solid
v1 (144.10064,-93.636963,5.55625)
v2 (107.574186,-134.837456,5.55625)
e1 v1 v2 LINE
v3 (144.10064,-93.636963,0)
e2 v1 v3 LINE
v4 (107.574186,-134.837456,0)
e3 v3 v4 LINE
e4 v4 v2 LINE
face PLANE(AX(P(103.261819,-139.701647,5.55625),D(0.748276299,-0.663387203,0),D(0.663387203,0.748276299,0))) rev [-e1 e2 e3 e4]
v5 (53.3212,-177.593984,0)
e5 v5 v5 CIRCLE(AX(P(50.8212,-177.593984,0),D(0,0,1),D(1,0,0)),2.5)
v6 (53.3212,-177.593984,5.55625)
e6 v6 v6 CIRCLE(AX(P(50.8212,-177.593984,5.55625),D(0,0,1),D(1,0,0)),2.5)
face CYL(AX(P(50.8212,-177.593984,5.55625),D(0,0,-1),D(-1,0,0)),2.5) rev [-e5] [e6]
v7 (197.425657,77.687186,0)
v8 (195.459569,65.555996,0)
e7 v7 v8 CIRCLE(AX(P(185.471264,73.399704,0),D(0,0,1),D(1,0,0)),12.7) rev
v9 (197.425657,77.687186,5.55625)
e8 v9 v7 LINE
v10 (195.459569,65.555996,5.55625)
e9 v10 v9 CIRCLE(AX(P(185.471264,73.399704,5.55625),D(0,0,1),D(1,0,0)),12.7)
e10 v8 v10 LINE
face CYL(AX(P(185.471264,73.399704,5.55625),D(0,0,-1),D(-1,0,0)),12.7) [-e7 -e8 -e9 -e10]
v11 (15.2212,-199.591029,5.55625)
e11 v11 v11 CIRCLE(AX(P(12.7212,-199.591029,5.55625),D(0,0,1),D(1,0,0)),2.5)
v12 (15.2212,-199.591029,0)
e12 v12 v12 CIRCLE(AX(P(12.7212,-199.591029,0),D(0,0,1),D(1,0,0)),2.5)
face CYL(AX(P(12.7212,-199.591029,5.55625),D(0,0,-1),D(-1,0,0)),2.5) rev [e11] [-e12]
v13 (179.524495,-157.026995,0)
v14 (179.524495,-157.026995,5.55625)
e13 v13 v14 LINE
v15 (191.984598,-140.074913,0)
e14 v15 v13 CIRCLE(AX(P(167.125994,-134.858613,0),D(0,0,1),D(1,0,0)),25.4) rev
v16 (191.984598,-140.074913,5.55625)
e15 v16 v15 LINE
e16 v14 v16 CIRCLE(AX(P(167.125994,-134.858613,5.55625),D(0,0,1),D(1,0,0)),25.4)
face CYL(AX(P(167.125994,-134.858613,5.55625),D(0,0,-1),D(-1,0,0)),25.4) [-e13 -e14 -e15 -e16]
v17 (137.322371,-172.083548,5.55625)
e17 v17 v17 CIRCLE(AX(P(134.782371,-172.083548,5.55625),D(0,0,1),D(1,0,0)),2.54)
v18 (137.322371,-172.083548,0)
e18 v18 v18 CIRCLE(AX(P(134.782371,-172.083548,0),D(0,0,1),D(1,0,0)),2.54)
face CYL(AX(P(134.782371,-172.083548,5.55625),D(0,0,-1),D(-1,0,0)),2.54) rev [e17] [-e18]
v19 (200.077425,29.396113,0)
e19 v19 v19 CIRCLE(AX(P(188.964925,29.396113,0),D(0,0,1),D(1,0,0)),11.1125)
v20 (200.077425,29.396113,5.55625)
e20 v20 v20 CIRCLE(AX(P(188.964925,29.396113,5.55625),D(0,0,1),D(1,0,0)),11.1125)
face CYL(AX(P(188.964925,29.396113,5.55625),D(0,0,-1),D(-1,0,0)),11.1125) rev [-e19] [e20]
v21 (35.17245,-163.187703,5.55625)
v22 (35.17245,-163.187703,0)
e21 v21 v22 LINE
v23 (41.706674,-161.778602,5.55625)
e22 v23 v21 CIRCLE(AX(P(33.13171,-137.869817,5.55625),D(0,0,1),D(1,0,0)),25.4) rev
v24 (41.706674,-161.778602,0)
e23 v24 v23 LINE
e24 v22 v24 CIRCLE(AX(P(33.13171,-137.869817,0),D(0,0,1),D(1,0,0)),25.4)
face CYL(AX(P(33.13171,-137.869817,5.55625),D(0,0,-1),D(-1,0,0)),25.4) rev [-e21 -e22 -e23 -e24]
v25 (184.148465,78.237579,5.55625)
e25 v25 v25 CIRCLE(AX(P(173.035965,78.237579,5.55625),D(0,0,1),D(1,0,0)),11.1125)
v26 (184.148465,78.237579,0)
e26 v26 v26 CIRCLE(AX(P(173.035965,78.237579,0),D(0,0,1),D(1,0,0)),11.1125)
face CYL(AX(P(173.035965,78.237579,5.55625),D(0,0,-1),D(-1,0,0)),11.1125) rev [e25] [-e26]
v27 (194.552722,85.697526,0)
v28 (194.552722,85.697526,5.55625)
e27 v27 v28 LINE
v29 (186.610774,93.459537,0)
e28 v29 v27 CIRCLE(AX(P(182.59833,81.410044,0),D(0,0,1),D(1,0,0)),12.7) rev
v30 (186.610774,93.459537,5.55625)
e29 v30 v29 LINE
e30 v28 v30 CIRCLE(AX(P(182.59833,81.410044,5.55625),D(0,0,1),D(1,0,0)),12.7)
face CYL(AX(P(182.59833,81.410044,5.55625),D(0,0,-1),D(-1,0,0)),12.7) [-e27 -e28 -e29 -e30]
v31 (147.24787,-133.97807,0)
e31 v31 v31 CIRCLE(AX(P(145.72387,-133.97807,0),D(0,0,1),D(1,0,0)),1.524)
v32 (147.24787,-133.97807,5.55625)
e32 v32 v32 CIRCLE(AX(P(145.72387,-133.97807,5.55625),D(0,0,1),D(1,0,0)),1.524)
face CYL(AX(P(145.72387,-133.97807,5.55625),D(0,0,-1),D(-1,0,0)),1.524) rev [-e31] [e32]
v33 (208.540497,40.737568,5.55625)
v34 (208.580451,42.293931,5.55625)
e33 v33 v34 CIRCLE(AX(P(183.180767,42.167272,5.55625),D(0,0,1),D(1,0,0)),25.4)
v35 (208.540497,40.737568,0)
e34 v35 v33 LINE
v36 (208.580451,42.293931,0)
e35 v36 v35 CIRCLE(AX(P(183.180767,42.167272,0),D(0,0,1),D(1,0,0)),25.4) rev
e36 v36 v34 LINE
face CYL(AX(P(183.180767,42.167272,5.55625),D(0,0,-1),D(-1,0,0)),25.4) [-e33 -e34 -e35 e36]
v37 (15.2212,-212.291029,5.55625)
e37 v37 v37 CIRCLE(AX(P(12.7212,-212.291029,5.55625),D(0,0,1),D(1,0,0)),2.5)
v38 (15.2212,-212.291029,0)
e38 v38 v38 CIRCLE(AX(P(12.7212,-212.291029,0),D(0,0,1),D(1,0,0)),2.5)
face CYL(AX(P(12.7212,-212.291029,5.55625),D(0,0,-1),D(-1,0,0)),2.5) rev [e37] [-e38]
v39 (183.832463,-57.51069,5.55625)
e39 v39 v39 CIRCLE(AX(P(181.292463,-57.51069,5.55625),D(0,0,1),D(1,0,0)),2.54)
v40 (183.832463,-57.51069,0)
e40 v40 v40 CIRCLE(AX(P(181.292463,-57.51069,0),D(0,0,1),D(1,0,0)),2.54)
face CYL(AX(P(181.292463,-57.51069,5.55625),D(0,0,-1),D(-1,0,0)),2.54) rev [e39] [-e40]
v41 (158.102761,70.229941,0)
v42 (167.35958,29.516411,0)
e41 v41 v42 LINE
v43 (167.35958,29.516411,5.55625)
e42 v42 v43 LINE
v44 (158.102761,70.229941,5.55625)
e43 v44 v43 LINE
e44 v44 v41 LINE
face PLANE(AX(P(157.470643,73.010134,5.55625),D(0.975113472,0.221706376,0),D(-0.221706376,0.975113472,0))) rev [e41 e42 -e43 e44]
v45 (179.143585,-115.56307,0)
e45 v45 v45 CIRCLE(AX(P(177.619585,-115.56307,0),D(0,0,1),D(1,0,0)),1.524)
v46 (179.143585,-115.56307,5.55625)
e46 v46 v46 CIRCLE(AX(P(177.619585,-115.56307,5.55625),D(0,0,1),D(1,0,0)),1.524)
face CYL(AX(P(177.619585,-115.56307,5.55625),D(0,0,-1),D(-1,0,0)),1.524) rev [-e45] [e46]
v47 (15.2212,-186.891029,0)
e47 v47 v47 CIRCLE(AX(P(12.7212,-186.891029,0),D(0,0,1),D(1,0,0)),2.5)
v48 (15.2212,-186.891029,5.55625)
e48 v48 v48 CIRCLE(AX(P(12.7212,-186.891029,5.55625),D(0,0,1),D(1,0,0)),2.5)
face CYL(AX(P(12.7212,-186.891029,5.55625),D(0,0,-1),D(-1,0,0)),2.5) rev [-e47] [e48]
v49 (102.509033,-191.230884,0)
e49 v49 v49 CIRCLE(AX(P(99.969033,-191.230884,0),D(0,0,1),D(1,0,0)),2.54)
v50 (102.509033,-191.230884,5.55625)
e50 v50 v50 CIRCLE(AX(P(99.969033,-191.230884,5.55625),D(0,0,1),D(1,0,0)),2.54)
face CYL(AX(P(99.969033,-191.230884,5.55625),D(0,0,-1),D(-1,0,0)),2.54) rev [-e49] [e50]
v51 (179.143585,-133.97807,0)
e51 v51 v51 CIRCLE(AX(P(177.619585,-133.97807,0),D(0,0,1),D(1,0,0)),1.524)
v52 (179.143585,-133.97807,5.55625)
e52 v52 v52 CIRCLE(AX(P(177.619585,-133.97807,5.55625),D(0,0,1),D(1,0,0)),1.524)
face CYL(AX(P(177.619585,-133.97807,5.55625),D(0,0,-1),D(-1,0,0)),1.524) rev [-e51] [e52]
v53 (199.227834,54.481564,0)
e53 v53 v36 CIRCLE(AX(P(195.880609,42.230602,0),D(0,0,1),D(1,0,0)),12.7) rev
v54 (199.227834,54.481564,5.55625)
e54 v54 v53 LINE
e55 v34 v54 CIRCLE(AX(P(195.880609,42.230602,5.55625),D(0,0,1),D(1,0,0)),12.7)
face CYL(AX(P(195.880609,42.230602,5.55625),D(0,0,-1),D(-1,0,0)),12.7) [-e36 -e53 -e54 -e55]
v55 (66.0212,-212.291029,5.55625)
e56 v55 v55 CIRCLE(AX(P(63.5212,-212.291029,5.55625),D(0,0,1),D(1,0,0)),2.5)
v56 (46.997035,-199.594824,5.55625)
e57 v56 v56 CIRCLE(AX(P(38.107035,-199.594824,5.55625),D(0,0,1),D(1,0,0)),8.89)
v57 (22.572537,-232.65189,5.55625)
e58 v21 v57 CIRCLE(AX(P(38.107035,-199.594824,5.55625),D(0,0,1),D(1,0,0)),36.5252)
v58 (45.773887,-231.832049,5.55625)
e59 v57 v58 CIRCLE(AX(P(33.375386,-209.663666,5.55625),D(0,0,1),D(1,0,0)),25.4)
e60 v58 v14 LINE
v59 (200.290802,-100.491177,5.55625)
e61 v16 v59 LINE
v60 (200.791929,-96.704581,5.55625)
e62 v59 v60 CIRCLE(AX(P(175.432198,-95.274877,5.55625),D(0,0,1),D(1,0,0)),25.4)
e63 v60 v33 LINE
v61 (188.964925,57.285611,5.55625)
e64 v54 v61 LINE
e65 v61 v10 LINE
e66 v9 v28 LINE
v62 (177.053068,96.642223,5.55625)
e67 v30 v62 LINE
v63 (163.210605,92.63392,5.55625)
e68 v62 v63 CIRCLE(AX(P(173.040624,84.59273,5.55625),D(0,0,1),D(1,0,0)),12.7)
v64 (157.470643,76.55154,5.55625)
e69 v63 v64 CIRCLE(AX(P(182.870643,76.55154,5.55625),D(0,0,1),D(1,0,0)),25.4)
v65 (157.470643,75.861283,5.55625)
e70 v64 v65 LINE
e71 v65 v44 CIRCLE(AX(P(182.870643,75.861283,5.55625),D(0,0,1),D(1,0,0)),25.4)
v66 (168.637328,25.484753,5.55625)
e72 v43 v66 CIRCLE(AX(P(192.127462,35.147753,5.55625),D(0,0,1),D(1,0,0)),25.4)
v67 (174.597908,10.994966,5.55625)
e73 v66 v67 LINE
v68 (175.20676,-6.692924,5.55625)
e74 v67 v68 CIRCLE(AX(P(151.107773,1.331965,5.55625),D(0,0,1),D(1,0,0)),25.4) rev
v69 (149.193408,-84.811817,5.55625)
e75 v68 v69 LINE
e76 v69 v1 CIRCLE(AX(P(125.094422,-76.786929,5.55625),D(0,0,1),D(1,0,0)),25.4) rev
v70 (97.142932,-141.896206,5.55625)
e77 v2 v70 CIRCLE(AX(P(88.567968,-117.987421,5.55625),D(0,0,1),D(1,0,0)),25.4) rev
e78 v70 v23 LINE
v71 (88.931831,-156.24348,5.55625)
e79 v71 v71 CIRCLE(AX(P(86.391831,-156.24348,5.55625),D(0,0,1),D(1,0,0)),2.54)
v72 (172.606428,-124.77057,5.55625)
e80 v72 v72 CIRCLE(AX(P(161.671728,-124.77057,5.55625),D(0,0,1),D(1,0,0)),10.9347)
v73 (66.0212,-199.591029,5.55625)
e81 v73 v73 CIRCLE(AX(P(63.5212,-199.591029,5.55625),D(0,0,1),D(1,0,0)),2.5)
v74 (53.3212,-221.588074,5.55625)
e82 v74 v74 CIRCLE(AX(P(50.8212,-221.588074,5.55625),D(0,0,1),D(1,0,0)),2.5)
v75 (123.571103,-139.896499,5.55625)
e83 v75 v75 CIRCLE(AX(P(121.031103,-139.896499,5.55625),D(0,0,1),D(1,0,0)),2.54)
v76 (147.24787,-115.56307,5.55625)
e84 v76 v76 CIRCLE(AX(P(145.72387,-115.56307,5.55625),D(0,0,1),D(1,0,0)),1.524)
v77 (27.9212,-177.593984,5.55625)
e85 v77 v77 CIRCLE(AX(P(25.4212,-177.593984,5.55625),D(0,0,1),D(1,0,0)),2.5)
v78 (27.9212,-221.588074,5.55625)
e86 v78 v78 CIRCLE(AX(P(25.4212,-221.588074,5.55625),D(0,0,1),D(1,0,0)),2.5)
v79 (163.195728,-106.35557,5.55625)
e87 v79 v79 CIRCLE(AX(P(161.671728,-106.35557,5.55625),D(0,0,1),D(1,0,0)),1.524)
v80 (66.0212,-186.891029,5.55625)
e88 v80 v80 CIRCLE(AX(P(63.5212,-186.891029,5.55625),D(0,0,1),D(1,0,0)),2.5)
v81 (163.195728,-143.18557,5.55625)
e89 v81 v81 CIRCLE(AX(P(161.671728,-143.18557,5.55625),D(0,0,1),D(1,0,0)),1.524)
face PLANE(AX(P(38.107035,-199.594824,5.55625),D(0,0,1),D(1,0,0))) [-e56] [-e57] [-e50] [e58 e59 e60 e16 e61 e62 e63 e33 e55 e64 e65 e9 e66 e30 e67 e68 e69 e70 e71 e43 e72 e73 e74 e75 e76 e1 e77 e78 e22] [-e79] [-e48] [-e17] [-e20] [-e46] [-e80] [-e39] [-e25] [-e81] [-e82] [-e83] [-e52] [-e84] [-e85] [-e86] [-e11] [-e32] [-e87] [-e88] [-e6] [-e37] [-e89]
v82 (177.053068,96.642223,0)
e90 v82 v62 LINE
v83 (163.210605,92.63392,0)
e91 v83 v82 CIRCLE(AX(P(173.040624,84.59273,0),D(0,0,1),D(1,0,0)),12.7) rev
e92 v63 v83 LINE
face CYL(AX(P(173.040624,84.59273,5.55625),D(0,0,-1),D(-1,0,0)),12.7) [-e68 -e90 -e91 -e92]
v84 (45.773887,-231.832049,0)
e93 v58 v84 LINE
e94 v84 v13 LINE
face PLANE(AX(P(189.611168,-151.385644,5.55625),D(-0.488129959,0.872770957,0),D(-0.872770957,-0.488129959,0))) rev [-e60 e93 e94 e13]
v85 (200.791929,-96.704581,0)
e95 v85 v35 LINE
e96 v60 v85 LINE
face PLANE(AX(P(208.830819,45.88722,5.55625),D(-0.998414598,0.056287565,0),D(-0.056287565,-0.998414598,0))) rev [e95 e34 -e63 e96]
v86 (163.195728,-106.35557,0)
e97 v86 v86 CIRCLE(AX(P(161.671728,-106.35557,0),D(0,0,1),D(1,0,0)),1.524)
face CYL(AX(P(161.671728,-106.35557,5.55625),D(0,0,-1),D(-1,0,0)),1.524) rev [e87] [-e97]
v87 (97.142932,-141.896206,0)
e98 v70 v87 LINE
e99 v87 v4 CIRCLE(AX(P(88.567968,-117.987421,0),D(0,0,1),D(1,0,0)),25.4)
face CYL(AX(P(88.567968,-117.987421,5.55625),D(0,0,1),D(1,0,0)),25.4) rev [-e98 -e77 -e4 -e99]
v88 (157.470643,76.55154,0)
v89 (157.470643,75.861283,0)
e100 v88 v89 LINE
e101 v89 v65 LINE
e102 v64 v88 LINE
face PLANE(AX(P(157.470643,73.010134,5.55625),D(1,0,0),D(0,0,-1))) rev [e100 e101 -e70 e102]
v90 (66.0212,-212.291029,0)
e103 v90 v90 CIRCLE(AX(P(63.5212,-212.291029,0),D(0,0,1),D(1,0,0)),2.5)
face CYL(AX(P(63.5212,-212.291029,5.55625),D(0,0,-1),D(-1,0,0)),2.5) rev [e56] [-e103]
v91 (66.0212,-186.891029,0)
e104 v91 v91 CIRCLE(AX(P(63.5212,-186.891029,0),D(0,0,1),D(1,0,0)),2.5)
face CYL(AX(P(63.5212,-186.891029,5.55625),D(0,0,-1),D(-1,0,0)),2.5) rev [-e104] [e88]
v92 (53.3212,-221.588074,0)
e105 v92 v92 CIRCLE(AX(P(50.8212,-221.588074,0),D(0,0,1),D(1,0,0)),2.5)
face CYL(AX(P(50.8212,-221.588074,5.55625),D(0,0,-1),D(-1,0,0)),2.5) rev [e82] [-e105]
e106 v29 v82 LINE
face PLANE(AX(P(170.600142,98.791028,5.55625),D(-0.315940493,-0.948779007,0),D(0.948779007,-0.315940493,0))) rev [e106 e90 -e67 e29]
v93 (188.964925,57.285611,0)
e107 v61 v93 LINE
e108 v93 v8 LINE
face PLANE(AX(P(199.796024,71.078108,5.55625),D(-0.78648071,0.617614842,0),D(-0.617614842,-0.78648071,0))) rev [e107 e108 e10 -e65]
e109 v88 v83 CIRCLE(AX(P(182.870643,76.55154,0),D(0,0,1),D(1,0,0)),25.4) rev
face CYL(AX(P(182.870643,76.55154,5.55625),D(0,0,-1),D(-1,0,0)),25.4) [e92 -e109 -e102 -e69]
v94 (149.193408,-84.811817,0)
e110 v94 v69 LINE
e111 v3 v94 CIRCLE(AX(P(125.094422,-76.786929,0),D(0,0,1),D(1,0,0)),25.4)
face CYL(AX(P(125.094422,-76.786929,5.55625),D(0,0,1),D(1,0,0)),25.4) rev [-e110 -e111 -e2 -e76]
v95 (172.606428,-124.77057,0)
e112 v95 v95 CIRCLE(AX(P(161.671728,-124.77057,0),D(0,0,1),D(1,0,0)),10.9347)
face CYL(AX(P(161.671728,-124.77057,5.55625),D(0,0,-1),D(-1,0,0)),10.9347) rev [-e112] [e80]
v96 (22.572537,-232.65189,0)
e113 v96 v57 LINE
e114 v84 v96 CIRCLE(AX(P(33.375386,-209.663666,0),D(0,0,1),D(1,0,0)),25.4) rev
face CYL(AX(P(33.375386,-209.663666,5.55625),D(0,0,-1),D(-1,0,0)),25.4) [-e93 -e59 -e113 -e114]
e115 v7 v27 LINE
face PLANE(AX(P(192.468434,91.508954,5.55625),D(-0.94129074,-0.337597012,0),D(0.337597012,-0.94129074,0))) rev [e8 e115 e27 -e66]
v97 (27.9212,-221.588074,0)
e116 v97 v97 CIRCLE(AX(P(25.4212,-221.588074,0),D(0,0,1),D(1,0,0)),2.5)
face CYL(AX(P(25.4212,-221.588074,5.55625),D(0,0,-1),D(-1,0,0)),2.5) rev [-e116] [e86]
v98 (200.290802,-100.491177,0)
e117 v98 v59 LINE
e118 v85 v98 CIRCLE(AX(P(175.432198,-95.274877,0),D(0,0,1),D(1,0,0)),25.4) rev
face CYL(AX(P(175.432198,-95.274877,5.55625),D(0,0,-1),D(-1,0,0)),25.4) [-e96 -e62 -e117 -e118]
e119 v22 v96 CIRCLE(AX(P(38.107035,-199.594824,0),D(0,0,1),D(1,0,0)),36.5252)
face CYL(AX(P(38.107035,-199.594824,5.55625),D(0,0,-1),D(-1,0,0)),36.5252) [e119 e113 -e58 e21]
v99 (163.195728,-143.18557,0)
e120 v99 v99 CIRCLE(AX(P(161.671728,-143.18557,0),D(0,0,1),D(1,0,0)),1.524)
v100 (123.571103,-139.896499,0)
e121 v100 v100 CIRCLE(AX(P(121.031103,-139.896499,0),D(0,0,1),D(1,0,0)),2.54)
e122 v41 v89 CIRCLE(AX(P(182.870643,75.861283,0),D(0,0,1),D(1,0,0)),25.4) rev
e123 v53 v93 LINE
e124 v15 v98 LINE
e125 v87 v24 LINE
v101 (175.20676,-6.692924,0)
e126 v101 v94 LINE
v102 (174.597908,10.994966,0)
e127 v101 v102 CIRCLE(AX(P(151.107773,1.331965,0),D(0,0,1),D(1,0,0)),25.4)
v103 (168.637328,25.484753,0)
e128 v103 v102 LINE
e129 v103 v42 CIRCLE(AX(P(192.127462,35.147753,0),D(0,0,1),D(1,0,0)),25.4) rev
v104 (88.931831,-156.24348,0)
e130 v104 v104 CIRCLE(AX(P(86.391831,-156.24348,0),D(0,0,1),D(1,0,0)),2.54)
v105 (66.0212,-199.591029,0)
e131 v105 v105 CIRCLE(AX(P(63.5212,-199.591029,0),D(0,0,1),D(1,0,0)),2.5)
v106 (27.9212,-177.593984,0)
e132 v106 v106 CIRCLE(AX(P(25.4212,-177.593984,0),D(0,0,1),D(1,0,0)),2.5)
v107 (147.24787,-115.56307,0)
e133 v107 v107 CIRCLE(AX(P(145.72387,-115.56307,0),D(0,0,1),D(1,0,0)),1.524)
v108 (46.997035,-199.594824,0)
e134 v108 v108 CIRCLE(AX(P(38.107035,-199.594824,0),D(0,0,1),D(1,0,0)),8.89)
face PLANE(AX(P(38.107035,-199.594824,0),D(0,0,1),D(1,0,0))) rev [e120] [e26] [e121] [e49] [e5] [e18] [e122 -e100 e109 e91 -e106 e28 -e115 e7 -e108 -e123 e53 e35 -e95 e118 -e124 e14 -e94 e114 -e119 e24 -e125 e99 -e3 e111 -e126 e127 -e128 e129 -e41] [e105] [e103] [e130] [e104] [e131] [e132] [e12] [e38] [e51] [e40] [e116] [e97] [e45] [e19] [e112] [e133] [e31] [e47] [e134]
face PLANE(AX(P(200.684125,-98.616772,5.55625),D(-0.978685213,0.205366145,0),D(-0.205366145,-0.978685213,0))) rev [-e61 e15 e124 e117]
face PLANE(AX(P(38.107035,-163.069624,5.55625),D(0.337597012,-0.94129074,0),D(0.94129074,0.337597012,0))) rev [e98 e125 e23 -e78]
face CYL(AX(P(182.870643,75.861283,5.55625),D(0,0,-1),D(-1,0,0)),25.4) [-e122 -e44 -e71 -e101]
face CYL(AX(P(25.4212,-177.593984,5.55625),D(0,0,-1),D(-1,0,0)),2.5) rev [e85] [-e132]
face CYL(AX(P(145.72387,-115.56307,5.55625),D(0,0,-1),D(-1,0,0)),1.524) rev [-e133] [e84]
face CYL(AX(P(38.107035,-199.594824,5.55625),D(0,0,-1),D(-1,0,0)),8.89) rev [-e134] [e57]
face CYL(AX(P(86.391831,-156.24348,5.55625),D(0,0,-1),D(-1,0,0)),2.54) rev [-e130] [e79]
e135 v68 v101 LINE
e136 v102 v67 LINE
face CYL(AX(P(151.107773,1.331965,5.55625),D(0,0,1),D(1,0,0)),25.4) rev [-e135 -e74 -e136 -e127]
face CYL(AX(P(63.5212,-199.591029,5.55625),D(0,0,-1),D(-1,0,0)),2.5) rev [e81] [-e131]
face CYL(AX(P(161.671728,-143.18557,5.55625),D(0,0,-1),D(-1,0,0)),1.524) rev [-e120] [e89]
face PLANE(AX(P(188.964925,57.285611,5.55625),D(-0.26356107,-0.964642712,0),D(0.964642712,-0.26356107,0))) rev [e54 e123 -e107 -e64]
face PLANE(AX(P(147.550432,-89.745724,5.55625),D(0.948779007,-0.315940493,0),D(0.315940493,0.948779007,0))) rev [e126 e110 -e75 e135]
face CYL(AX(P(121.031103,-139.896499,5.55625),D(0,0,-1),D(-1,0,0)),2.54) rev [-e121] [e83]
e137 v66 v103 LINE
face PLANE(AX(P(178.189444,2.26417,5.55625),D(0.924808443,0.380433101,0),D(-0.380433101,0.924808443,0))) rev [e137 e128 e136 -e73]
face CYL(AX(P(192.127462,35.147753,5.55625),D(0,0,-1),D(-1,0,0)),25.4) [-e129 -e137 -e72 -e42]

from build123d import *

# Parameters (mm, degrees)
SKETCH1_R           = 8.89
SKETCH1_R_2         = 10.9347
SKETCH1_R_3         = 11.1125
SKETCH1_R_4         = 1.524
SKETCH1_R_5         = 2.5
SKETCH1_R_6         = 2.54
BOSS_EXTRUDE1_DEPTH = 5.55625
FILLET1_R           = 25.4
FILLET3_R           = 12.7
FILLET4_R           = 12.7


with BuildPart() as part:
    # Sketch1 → Boss-Extrude1 (new body)
    with BuildSketch(Plane.XY):
        with BuildLine():
            Line((199.79602437, 71.078107547), (188.964925061, 57.285610842))
            Line((188.964925061, 57.285610842), (206.456809173, 52.506453094))
            Line((206.456809173, 52.506453094), (208.830818929, 45.887219752))
            Line((208.830818929, 45.887219752), (200.684125291, -98.616772294))
            Line((200.684125291, -98.616772294), (189.611167808, -151.385643895))
            Line((189.611167808, -151.385643895), (38.107034572, -236.120024372))
            ThreePointArc((38.107034572, -236.120024372), (1.581834572, -199.594824372), (38.107034572, -163.069624372))
            Line((38.107034572, -163.069624372), (103.261818833, -139.701647224))
            Line((103.261818833, -139.701647224), (147.550432491, -89.7457244))
            Line((147.550432491, -89.7457244), (171.836242771, -16.814689905))
            Line((171.836242771, -16.814689905), (178.189444477, 2.26417003))
            Line((178.189444477, 2.26417003), (167.830043749, 27.447208055))
            Line((167.830043749, 27.447208055), (157.470643022, 73.010133983))
            Line((157.470643022, 73.010133983), (157.470643022, 93.390021886))
            Line((157.470643022, 93.390021886), (170.600142232, 98.791028052))
            Line((170.600142232, 98.791028052), (192.468434241, 91.508954042))
            Line((192.468434241, 91.508954042), (199.79602437, 71.078107547))
        make_face()
        with Locations((38.107034572, -199.594824372)):
            Circle(SKETCH1_R, mode=Mode.SUBTRACT)
        with Locations((161.671727665, -124.770570211)):
            Circle(SKETCH1_R_2, mode=Mode.SUBTRACT)
        with Locations((188.964925061, 29.396113336)):
            Circle(SKETCH1_R_3, mode=Mode.SUBTRACT)
        with Locations((173.035965272, 78.237579188)):
            Circle(SKETCH1_R_3, mode=Mode.SUBTRACT)
        with Locations((161.671727665, -106.355570211)):
            Circle(SKETCH1_R_4, mode=Mode.SUBTRACT)
        with Locations((12.721199582, -186.891028869)):
            Circle(SKETCH1_R_5, mode=Mode.SUBTRACT)
        with Locations((177.619585475, -115.563070211)):
            Circle(SKETCH1_R_4, mode=Mode.SUBTRACT)
        with Locations((177.619585475, -133.978070211)):
            Circle(SKETCH1_R_4, mode=Mode.SUBTRACT)
        with Locations((161.671727665, -143.185570211)):
            Circle(SKETCH1_R_4, mode=Mode.SUBTRACT)
        with Locations((145.723869854, -133.978070211)):
            Circle(SKETCH1_R_4, mode=Mode.SUBTRACT)
        with Locations((145.723869854, -115.563070211)):
            Circle(SKETCH1_R_4, mode=Mode.SUBTRACT)
        with Locations((12.721199582, -199.591028869)):
            Circle(SKETCH1_R_5, mode=Mode.SUBTRACT)
        with Locations((12.721199582, -212.291028869)):
            Circle(SKETCH1_R_5, mode=Mode.SUBTRACT)
        with Locations((25.421199582, -221.588074125)):
            Circle(SKETCH1_R_5, mode=Mode.SUBTRACT)
        with Locations((25.421199582, -177.593983613)):
            Circle(SKETCH1_R_5, mode=Mode.SUBTRACT)
        with Locations((50.821199582, -177.593983613)):
            Circle(SKETCH1_R_5, mode=Mode.SUBTRACT)
        with Locations((63.521199582, -186.891028869)):
            Circle(SKETCH1_R_5, mode=Mode.SUBTRACT)
        with Locations((63.521199582, -199.591028869)):
            Circle(SKETCH1_R_5, mode=Mode.SUBTRACT)
        with Locations((63.521199582, -212.291028869)):
            Circle(SKETCH1_R_5, mode=Mode.SUBTRACT)
        with Locations((50.821199582, -221.588074125)):
            Circle(SKETCH1_R_5, mode=Mode.SUBTRACT)
        with Locations((181.29246285, -57.510690342)):
            Circle(SKETCH1_R_6, mode=Mode.SUBTRACT)
        with Locations((99.96903305, -191.23088449)):
            Circle(SKETCH1_R_6, mode=Mode.SUBTRACT)
        with Locations((134.782371312, -172.083548446)):
            Circle(SKETCH1_R_6, mode=Mode.SUBTRACT)
        with Locations((121.031102699, -139.896498857)):
            Circle(SKETCH1_R_6, mode=Mode.SUBTRACT)
        with Locations((86.391831128, -156.243479537)):
            Circle(SKETCH1_R_6, mode=Mode.SUBTRACT)
    extrude(amount=BOSS_EXTRUDE1_DEPTH)

    # Fillet1
    # the kernel refuses this fillet: 25.4 mm, written as the material it adds along each edge
    with BuildSketch(Plane(origin=(178.189444477, 2.26417003, 0), x_dir=(-0.38043310119112633, 0.9248084426074961, 0), z_dir=(0, 0, 1))) as fillet1_piece_1:
        with BuildLine():
            CenterArc((FILLET1_R * 0.371679258358, FILLET1_R), FILLET1_R, 229.221887669, 40.778112331)
            Line((-FILLET1_R * 0.281452116845, FILLET1_R * 0.242755385146), (0, 0))
            Line((0, 0), (FILLET1_R * 0.371679258358, 0))
        make_face()
    extrude(amount=5.55625)
    with BuildSketch(Plane(origin=(147.550432491, -89.7457244, 0), x_dir=(0.3159404927300864, 0.9487790074898739, 0), z_dir=(0, 0, 1))) as fillet1_piece_2:
        with BuildLine():
            CenterArc((FILLET1_R * 0.204735054156, FILLET1_R), FILLET1_R, 246.858885181, 23.141114819)
            Line((-FILLET1_R * 0.188262015137, FILLET1_R * 0.0804602762649), (0, 0))
            Line((0, 0), (FILLET1_R * 0.204735054156, 0))
        make_face()
    extrude(amount=5.55625)
    with BuildSketch(Plane(origin=(103.261818833, -139.701647224, 0), x_dir=(0.6633872027522849, 0.7482762987189282, 0), z_dir=(0, 0, 1))) as fillet1_piece_3:
        with BuildLine():
            CenterArc((FILLET1_R * 0.255926298649, FILLET1_R), FILLET1_R, 241.289253159, 28.710746841)
            Line((-FILLET1_R * 0.224461714683, FILLET1_R * 0.122943926167), (0, 0))
            Line((0, 0), (FILLET1_R * 0.255926298649, 0))
        make_face()
    extrude(amount=5.55625)
    with BuildSketch(Plane(origin=(38.107034572, -163.069624372, 0), x_dir=(-0.999191470019892, -0.040204554959449905, 0), z_dir=(0, 0, 1))) as fillet1_piece_4:
        with BuildLine():
            CenterArc((3.958154518, -25.379463339), FILLET1_R, 92.304172347, 15.122193833)
            Line((-3.648634427, -1.145256895), (0, 0))
            ThreePointArc((0, 0), (1.468479411, -0.029531719), (2.936958822, 0))
        make_face()
    extrude(amount=5.55625)
    # the kernel refuses this fillet: 25.4 mm, written as the material it takes off along each edge
    with BuildSketch(Plane(origin=(157.470643022, 93.390021886, -42.096203676), x_dir=(0, -1, 0), z_dir=(0, 0, 1))) as fillet1_2_piece_1:
        with BuildLine():
            CenterArc((16.83848147, 25.4), FILLET1_R, 208.887448124, 61.112551876)
            Line((-5.401006167, 13.12949921), (0, 0))
            Line((0, 0), (16.83848147, 0))
        make_face()
    extrude(amount=89.748657352, mode=Mode.SUBTRACT)
    with BuildSketch(Plane(origin=(157.470643022, 73.010133983, -7.12787144), x_dir=(0.2217063764510564, -0.9751134716744213, 0), z_dir=(0, 0, 1))) as fillet1_2_piece_2:
        with BuildLine():
            CenterArc((FILLET1_R * 0.11224994393, FILLET1_R), FILLET1_R, 257.190723516, 12.809276484)
            Line((-FILLET1_R * 0.109456432521, FILLET1_R * 0.0248865283256), (0, 0))
            Line((0, 0), (FILLET1_R * 0.11224994393, 0))
        make_face()
    extrude(amount=19.811992879, mode=Mode.SUBTRACT)
    with BuildSketch(Plane(origin=(167.830043749, 27.447208055, -5.305032246), x_dir=(0.38043310119112356, -0.9248084426074973, 0), z_dir=(0, 0, 1))) as fillet1_2_piece_3:
        with BuildLine():
            CenterArc((FILLET1_R * 0.0835438149047, FILLET1_R), FILLET1_R, 260.448763965, 9.551236035)
            Line((-FILLET1_R * 0.0823856984158, FILLET1_R * 0.0138623845481), (0, 0))
            Line((0, 0), (FILLET1_R * 0.0835438149047, 0))
        make_face()
    extrude(amount=16.166314493, mode=Mode.SUBTRACT)
    with BuildSketch(Plane(origin=(38.107034572, -236.120024372, -39.792317969), x_dir=(-0.975973408380196, 0.21788966504803134, 0), z_dir=(0, 0, 1))) as fillet1_2_piece_4:
        with BuildLine():
            CenterArc((10.382529695, -24.789724573), FILLET1_R, 77.414886959, 54.38796922)
            Line((-6.548338937, -5.855478157), (0, 0))
            ThreePointArc((0, 0), (7.958463594, 0.877576064), (15.916927188, 0))
        make_face()
    extrude(amount=85.140885938, mode=Mode.SUBTRACT)
    with BuildSketch(Plane(origin=(189.611167808, -151.385643895, -28.892669195), x_dir=(-0.8727709569033328, -0.4881299589105759, 0), z_dir=(0, 0, 1))) as fillet1_2_piece_5:
        with BuildLine():
            CenterArc((FILLET1_R * 0.455002664481, -FILLET1_R), FILLET1_R, 90, 48.931323179)
            Line((-FILLET1_R * 0.298919997384, -FILLET1_R * 0.343036819962), (0, 0))
            Line((0, 0), (FILLET1_R * 0.455002664481, 0))
        make_face()
    extrude(amount=63.341588389, mode=Mode.SUBTRACT)
    with BuildSketch(Plane(origin=(200.684125291, -98.616772294, -4.788068762), x_dir=(0.056287565067425785, 0.9984145982600516, 0), z_dir=(0, 0, 1))) as fillet1_2_piece_6:
        with BuildLine():
            CenterArc((FILLET1_R * 0.0754026576756, FILLET1_R), FILLET1_R, 261.375811644, 8.624188356)
            Line((-FILLET1_R * 0.0745500922014, FILLET1_R * 0.0113068358665), (0, 0))
            Line((0, 0), (FILLET1_R * 0.0754026576756, 0))
        make_face()
    extrude(amount=15.132387525, mode=Mode.SUBTRACT)
    with BuildSketch(Plane(origin=(208.830818929, 45.887219752, -12.894572268), x_dir=(-0.3375970122965893, 0.9412907400417878, 0), z_dir=(0, 0, 1))) as fillet1_2_piece_7:
        with BuildLine():
            CenterArc((FILLET1_R * 0.203064130199, FILLET1_R), FILLET1_R, 247.042716146, 22.957283854)
            Line((-FILLET1_R * 0.186980618985, FILLET1_R * 0.0792040977315), (0, 0))
            Line((0, 0), (FILLET1_R * 0.203064130199, 0))
        make_face()
    extrude(amount=31.345394535, mode=Mode.SUBTRACT)

    # Fillet3
    fillet3_edges = [part.edges().sort_by_distance(p)[0] for p in [
        (170.600142232, 98.791028052, 2.778125),
        (192.468434241, 91.508954042, 2.778125),
    ]]
    fillet(fillet3_edges, radius=FILLET3_R)

    # Fillet4
    fillet4_edges = [part.edges().sort_by_distance(p)[0] for p in [
        (206.456809173, 52.506453094, 2.778125),
        (199.79602437, 71.078107547, 2.778125),
    ]]
    fillet(fillet4_edges, radius=FILLET4_R)


solid = part.part
